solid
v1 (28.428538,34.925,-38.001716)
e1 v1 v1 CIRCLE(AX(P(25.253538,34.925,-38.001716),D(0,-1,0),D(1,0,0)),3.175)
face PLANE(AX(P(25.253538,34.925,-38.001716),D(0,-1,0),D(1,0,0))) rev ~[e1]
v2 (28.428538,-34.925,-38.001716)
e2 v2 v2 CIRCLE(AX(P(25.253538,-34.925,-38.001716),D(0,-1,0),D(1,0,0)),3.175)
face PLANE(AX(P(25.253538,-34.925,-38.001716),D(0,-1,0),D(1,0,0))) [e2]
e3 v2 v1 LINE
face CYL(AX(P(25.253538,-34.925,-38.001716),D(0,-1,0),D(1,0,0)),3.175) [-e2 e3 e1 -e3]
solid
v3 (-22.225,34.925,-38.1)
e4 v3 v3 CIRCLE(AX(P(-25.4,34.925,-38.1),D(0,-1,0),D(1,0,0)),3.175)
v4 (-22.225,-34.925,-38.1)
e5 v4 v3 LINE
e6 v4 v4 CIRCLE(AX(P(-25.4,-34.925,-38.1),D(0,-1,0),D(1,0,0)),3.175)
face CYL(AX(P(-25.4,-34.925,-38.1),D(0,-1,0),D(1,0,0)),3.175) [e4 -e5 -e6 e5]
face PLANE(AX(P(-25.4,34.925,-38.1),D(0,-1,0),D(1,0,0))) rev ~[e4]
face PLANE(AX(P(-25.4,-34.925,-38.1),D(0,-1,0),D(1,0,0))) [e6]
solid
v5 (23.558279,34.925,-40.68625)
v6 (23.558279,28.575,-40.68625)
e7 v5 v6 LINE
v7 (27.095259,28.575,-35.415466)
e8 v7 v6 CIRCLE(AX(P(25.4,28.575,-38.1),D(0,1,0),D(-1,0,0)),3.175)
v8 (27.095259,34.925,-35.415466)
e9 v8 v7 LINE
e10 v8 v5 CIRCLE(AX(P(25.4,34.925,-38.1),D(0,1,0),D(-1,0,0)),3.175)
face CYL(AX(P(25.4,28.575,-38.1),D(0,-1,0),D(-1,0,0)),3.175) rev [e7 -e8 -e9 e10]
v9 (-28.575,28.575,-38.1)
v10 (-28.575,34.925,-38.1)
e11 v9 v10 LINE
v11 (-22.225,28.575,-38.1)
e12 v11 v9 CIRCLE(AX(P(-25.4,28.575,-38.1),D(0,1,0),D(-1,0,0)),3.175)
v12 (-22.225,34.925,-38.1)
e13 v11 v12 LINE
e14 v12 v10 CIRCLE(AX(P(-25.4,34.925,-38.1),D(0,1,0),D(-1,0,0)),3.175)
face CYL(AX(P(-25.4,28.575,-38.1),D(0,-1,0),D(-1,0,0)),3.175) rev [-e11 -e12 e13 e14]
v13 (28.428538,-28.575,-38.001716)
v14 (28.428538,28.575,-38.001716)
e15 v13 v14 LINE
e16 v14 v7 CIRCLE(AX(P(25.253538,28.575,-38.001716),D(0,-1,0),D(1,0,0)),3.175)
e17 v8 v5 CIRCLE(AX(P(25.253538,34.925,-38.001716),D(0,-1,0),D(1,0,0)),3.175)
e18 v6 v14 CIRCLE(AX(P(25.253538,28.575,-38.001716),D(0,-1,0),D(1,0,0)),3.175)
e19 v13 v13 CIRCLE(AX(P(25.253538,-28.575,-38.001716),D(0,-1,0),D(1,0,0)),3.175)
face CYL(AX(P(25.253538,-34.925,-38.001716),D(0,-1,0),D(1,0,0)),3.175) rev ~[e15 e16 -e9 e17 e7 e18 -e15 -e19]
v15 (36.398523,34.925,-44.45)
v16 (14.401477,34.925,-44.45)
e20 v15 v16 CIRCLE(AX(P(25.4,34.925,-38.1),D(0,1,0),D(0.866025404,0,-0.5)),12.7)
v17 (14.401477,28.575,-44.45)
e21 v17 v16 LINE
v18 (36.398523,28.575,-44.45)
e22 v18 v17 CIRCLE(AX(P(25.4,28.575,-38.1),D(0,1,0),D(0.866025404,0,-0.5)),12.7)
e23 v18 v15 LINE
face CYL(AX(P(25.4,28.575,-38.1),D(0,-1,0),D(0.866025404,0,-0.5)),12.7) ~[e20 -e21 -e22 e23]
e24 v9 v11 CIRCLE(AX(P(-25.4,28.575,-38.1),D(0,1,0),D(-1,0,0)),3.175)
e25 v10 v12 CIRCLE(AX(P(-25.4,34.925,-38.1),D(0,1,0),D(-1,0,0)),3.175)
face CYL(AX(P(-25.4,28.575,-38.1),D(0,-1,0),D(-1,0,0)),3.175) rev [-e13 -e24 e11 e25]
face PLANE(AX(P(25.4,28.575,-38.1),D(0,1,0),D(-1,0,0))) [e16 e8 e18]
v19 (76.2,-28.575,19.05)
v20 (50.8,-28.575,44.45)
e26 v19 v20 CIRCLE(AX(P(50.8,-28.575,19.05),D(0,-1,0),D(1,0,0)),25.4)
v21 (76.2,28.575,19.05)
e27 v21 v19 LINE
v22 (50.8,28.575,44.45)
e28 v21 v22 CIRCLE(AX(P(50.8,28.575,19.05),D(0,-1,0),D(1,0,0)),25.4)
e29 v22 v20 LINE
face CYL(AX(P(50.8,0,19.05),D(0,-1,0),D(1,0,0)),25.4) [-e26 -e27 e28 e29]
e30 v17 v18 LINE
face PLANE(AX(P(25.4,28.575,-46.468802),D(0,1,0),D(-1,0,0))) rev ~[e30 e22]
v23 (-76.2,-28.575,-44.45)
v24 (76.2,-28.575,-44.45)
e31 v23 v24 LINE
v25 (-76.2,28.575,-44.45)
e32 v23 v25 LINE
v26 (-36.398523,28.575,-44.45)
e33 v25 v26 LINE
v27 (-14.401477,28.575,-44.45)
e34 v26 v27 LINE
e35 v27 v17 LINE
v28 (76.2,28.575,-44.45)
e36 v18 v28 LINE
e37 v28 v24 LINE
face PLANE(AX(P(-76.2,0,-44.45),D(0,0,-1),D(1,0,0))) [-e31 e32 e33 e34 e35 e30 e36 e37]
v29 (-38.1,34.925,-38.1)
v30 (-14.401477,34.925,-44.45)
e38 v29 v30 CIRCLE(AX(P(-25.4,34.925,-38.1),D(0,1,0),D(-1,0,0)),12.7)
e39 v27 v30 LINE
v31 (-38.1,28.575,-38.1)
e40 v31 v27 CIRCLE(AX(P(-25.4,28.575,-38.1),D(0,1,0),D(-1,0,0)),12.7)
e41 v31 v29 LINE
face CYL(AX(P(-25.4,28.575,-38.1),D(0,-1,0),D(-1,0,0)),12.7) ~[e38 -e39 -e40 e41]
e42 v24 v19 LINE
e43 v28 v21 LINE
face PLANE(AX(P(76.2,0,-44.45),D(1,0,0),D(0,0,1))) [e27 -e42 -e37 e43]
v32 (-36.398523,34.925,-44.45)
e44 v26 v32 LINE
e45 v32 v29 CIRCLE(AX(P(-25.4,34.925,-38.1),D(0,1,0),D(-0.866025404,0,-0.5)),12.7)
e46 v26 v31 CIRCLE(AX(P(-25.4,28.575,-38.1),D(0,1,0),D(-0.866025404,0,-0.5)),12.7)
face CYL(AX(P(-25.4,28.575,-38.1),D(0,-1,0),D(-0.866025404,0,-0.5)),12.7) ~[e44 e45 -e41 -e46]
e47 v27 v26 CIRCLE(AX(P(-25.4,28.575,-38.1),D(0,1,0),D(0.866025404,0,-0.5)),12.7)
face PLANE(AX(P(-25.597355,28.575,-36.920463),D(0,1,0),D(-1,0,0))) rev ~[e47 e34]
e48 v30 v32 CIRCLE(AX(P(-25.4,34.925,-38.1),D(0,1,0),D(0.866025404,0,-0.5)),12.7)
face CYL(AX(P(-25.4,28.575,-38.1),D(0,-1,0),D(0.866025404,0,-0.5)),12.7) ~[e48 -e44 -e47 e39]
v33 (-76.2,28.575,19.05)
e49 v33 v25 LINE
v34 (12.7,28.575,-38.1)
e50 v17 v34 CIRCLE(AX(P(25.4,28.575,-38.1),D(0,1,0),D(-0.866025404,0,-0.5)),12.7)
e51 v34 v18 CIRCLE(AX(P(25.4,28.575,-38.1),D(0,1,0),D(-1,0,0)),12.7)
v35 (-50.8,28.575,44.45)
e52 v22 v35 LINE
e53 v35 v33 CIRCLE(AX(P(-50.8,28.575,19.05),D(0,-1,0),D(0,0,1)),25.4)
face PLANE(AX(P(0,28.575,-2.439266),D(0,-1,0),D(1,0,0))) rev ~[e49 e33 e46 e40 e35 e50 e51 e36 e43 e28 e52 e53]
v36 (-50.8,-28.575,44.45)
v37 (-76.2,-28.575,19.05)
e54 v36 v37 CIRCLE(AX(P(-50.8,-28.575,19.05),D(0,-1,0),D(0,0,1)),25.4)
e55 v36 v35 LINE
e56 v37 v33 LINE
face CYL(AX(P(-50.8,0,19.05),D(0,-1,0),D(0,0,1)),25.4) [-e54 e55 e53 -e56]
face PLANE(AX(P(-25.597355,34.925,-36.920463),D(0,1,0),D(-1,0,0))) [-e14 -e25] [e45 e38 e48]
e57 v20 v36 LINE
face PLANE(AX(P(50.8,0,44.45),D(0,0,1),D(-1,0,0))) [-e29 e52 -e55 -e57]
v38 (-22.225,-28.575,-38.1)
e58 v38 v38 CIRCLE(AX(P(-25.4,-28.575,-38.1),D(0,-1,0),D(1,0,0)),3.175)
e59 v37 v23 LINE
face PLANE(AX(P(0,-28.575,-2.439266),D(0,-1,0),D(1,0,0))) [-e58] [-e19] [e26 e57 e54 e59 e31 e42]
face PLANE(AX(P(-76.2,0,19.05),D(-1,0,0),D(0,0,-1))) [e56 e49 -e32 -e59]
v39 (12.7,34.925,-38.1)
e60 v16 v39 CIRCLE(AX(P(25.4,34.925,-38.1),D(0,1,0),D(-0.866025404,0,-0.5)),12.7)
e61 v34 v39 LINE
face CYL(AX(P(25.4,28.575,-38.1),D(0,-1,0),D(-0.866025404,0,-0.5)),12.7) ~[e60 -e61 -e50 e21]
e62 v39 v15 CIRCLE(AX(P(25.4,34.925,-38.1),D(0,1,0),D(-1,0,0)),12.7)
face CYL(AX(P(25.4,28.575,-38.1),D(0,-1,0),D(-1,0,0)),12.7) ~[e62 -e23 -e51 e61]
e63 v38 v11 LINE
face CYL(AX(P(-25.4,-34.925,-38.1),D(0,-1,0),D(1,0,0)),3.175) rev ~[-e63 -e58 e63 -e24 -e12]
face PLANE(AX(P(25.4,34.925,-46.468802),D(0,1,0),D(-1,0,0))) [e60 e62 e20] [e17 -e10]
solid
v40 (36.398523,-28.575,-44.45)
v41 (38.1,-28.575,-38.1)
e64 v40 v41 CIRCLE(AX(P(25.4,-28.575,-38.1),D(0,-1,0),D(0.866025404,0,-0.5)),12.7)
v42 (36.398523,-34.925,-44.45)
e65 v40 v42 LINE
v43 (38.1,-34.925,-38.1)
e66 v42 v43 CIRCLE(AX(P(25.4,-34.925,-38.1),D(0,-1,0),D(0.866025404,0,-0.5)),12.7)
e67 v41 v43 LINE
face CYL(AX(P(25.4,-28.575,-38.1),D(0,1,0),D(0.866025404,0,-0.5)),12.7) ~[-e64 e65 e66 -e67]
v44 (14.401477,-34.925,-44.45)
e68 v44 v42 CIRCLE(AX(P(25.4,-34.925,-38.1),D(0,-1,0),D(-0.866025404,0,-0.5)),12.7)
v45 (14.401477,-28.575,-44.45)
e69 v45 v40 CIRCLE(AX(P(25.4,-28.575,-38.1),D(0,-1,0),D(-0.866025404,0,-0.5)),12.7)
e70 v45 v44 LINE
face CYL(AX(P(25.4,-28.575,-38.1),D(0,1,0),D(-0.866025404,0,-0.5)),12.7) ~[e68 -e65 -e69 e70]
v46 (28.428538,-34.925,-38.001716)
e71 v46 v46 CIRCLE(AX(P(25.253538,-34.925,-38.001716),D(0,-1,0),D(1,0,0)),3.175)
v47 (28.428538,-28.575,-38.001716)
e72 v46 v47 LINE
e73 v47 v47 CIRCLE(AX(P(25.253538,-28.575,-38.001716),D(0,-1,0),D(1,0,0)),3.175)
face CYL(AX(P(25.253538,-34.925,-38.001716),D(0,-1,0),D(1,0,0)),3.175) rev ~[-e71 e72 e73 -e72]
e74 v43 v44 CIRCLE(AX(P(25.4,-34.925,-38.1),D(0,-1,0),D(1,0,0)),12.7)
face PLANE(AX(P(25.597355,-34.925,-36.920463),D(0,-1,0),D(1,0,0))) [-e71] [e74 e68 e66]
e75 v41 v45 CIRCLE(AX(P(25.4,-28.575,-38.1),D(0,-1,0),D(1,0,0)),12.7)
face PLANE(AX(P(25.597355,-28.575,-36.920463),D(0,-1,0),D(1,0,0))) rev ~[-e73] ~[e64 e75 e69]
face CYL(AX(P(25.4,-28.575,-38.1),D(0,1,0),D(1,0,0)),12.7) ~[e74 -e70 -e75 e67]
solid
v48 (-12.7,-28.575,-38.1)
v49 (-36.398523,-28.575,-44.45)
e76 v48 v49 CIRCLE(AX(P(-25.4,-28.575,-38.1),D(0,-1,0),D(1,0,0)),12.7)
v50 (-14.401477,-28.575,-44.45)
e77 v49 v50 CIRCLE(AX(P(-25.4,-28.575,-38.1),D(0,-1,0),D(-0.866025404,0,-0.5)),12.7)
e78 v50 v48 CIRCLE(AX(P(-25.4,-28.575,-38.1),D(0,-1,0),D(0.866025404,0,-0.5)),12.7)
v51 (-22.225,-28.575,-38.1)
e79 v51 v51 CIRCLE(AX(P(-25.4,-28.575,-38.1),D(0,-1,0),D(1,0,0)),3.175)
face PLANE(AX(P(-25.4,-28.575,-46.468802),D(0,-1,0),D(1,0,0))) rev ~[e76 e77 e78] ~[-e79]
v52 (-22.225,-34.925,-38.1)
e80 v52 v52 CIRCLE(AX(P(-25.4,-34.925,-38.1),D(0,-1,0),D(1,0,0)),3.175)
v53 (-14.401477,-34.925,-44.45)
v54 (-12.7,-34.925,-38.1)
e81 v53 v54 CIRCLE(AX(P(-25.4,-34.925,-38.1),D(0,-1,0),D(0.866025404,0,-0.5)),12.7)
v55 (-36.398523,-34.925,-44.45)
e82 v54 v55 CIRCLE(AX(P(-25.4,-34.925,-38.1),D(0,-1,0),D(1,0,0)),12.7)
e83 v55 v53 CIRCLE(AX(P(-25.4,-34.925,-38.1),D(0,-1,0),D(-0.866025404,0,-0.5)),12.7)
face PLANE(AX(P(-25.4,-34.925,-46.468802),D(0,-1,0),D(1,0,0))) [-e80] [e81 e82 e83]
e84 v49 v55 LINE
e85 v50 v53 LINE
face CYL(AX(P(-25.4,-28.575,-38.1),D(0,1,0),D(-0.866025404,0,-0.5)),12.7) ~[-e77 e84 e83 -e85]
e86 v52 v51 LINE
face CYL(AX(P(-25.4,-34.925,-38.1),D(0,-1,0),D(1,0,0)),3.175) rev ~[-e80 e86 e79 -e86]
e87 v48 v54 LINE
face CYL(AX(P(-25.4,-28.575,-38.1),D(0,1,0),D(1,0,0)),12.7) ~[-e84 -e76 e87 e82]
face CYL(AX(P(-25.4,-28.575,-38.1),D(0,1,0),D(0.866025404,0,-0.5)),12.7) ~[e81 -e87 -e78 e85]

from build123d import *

# Parameters (mm, degrees)
F1_DEPTH    = 28.575
F3_DEPTH    = 6.35
F4_R        = 3.175
F5_DEPTH    = 6.35
F6_R        = 3.175
F5_FACE_R   = 12.7
F5_FACE_R_2 = 3.175
F7_DEPTH    = 69.851
F8_DEPTH    = 69.85


# Not quite as in the source:
# - a feature names something its author has since deleted; it is built from what else it names


with BuildPart() as f1:
    # F0 (on Front) → F1 (new body, symmetric)
    with BuildSketch(Plane.XZ):
        with BuildLine():
            Line((-76.2, -44.45), (76.2, -44.45))
            Line((76.2, -44.45), (76.2, 19.05))
            ThreePointArc((76.2, 19.05), (68.7605122421, 37.0105122421), (50.8, 44.45))
            Line((50.8, 44.45), (-50.8, 44.45))
            ThreePointArc((-50.8, 44.45), (-68.7605122421, 37.0105122421), (-76.2, 19.05))
            Line((-76.2, 19.05), (-76.2, -44.45))
        make_face()
    extrude(amount=F1_DEPTH, both=True)

    # F4 (on face) → F5 (join)
    with BuildSketch(Plane(origin=(0, 28.575, 0), x_dir=(-1, 0, 0), z_dir=(0, 1, 0))):
        with BuildLine():
            Line((-14.4014773719, -44.45), (-36.3985226281, -44.45))
            ThreePointArc((-36.3985226281, -44.45), (-25.4, -50.8), (-14.4014773719, -44.45))
        make_face()
        with BuildLine():
            ThreePointArc((38.1, -38.1), (22.1129981272, -25.8327420061), (14.4014773719, -44.45))
            Line((14.4014773719, -44.45), (36.3985226281, -44.45))
            ThreePointArc((36.3985226281, -44.45), (37.6672579939, -41.3870018728), (38.1, -38.1))
        make_face()
        with Locations((25.4, -38.1)):
            Circle(F4_R, mode=Mode.SUBTRACT)
        with BuildLine():
            Line((36.3985226281, -44.45), (14.4014773719, -44.45))
            ThreePointArc((14.4014773719, -44.45), (25.4, -50.8), (36.3985226281, -44.45))
        make_face()
        with BuildLine():
            ThreePointArc((-14.4014773719, -44.45), (-13.1327420061, -41.3870018728), (-12.7, -38.1))
            ThreePointArc((-12.7, -38.1), (-28.6870018728, -25.8327420061), (-36.3985226281, -44.45))
            Line((-36.3985226281, -44.45), (-14.4014773719, -44.45))
        make_face()
        with Locations((-25.4, -38.1)):
            Circle(F4_R, mode=Mode.SUBTRACT)
    extrude(amount=F5_DEPTH)


with BuildPart() as f3:
    # F2 (on face) → F3 (new body)
    with BuildSketch(Plane.XZ.offset(28.575)):
        with BuildLine():
            ThreePointArc((-36.3985226281, -44.45), (-25.4, -50.8), (-14.4014773719, -44.45))
            Line((-14.4014773719, -44.45), (-36.3985226281, -44.45))
        make_face()
        with BuildLine():
            Line((-36.3985226281, -44.45), (-14.4014773719, -44.45))
            ThreePointArc((-14.4014773719, -44.45), (-13.1327420061, -41.3870018728), (-12.7, -38.1))
            ThreePointArc((-12.7, -38.1), (-28.6870018728, -25.8327420061), (-36.3985226281, -44.45))
        make_face()
    extrude(amount=F3_DEPTH)


with BuildPart() as f3b:
    # F2 (on face) → F3, piece 2 (new body)
    with BuildSketch(Plane.XZ.offset(28.575)):
        with BuildLine():
            ThreePointArc((36.3985226281, -44.45), (37.6672579939, -41.3870018728), (38.1, -38.1))
            ThreePointArc((38.1, -38.1), (22.1129981272, -25.8327420061), (14.4014773719, -44.45))
            Line((14.4014773719, -44.45), (36.3985226281, -44.45))
        make_face()
        with BuildLine():
            Line((36.3985226281, -44.45), (14.4014773719, -44.45))
            ThreePointArc((14.4014773719, -44.45), (25.4, -50.8), (36.3985226281, -44.45))
        make_face()
    extrude(amount=F3_DEPTH)


with BuildPart() as f7_tool:
    # F6 (on face) + F4 (on face) + F5_face (on face) → F7 (new body, through all)
    with BuildSketch(Plane.XZ.offset(34.925)):
        with Locations((-25.4, -38.1)):
            Circle(F6_R)
        with Locations((25.2535380423, -38.0017161369)):
            Circle(F6_R)
    with BuildSketch(Plane(origin=(0, 28.575, 0), x_dir=(-1, 0, 0), z_dir=(0, 1, 0))):
        with Locations((-25.4, -38.1)):
            Circle(F4_R)
        with Locations((25.4, -38.1)):
            Circle(F4_R)
    with BuildSketch(Plane(origin=(-25.4, 34.925, -38.1), x_dir=(-1, 0, 0), z_dir=(0, 1, 0))):
        Circle(F5_FACE_R)
        Circle(F5_FACE_R_2, mode=Mode.SUBTRACT)
        with Locations((-50.8, 0)):
            Circle(F5_FACE_R)
        with Locations((-50.8, 0)):
            Circle(F5_FACE_R_2, mode=Mode.SUBTRACT)
    extrude(amount=-F7_DEPTH, dir=(0, -1, 0))


with BuildPart() as f1_1:
    add(f1.part)

    # F7: cut by f7_tool
    add(f7_tool.part, mode=Mode.SUBTRACT)


with BuildPart() as f3_1:
    add(f3.part)

    # F7: cut by f7_tool
    add(f7_tool.part, mode=Mode.SUBTRACT)


with BuildPart() as f3b_1:
    add(f3b.part)

    # F7: cut by f7_tool
    add(f7_tool.part, mode=Mode.SUBTRACT)


with BuildPart() as f8:
    # F6 (on face) → F8 (new body)
    with BuildSketch(Plane.XZ.offset(34.925)):
        with Locations((-25.4, -38.1)):
            Circle(F6_R)
    extrude(amount=-F8_DEPTH)


with BuildPart() as f8b:
    # F6 (on face) → F8, piece 2 (new body)
    with BuildSketch(Plane.XZ.offset(34.925)):
        with Locations((25.2535380423, -38.0017161369)):
            Circle(F6_R)
    extrude(amount=-F8_DEPTH)


solid = Compound([f1_1.part, f3_1.part, f3b_1.part, f8.part, f8b.part])
